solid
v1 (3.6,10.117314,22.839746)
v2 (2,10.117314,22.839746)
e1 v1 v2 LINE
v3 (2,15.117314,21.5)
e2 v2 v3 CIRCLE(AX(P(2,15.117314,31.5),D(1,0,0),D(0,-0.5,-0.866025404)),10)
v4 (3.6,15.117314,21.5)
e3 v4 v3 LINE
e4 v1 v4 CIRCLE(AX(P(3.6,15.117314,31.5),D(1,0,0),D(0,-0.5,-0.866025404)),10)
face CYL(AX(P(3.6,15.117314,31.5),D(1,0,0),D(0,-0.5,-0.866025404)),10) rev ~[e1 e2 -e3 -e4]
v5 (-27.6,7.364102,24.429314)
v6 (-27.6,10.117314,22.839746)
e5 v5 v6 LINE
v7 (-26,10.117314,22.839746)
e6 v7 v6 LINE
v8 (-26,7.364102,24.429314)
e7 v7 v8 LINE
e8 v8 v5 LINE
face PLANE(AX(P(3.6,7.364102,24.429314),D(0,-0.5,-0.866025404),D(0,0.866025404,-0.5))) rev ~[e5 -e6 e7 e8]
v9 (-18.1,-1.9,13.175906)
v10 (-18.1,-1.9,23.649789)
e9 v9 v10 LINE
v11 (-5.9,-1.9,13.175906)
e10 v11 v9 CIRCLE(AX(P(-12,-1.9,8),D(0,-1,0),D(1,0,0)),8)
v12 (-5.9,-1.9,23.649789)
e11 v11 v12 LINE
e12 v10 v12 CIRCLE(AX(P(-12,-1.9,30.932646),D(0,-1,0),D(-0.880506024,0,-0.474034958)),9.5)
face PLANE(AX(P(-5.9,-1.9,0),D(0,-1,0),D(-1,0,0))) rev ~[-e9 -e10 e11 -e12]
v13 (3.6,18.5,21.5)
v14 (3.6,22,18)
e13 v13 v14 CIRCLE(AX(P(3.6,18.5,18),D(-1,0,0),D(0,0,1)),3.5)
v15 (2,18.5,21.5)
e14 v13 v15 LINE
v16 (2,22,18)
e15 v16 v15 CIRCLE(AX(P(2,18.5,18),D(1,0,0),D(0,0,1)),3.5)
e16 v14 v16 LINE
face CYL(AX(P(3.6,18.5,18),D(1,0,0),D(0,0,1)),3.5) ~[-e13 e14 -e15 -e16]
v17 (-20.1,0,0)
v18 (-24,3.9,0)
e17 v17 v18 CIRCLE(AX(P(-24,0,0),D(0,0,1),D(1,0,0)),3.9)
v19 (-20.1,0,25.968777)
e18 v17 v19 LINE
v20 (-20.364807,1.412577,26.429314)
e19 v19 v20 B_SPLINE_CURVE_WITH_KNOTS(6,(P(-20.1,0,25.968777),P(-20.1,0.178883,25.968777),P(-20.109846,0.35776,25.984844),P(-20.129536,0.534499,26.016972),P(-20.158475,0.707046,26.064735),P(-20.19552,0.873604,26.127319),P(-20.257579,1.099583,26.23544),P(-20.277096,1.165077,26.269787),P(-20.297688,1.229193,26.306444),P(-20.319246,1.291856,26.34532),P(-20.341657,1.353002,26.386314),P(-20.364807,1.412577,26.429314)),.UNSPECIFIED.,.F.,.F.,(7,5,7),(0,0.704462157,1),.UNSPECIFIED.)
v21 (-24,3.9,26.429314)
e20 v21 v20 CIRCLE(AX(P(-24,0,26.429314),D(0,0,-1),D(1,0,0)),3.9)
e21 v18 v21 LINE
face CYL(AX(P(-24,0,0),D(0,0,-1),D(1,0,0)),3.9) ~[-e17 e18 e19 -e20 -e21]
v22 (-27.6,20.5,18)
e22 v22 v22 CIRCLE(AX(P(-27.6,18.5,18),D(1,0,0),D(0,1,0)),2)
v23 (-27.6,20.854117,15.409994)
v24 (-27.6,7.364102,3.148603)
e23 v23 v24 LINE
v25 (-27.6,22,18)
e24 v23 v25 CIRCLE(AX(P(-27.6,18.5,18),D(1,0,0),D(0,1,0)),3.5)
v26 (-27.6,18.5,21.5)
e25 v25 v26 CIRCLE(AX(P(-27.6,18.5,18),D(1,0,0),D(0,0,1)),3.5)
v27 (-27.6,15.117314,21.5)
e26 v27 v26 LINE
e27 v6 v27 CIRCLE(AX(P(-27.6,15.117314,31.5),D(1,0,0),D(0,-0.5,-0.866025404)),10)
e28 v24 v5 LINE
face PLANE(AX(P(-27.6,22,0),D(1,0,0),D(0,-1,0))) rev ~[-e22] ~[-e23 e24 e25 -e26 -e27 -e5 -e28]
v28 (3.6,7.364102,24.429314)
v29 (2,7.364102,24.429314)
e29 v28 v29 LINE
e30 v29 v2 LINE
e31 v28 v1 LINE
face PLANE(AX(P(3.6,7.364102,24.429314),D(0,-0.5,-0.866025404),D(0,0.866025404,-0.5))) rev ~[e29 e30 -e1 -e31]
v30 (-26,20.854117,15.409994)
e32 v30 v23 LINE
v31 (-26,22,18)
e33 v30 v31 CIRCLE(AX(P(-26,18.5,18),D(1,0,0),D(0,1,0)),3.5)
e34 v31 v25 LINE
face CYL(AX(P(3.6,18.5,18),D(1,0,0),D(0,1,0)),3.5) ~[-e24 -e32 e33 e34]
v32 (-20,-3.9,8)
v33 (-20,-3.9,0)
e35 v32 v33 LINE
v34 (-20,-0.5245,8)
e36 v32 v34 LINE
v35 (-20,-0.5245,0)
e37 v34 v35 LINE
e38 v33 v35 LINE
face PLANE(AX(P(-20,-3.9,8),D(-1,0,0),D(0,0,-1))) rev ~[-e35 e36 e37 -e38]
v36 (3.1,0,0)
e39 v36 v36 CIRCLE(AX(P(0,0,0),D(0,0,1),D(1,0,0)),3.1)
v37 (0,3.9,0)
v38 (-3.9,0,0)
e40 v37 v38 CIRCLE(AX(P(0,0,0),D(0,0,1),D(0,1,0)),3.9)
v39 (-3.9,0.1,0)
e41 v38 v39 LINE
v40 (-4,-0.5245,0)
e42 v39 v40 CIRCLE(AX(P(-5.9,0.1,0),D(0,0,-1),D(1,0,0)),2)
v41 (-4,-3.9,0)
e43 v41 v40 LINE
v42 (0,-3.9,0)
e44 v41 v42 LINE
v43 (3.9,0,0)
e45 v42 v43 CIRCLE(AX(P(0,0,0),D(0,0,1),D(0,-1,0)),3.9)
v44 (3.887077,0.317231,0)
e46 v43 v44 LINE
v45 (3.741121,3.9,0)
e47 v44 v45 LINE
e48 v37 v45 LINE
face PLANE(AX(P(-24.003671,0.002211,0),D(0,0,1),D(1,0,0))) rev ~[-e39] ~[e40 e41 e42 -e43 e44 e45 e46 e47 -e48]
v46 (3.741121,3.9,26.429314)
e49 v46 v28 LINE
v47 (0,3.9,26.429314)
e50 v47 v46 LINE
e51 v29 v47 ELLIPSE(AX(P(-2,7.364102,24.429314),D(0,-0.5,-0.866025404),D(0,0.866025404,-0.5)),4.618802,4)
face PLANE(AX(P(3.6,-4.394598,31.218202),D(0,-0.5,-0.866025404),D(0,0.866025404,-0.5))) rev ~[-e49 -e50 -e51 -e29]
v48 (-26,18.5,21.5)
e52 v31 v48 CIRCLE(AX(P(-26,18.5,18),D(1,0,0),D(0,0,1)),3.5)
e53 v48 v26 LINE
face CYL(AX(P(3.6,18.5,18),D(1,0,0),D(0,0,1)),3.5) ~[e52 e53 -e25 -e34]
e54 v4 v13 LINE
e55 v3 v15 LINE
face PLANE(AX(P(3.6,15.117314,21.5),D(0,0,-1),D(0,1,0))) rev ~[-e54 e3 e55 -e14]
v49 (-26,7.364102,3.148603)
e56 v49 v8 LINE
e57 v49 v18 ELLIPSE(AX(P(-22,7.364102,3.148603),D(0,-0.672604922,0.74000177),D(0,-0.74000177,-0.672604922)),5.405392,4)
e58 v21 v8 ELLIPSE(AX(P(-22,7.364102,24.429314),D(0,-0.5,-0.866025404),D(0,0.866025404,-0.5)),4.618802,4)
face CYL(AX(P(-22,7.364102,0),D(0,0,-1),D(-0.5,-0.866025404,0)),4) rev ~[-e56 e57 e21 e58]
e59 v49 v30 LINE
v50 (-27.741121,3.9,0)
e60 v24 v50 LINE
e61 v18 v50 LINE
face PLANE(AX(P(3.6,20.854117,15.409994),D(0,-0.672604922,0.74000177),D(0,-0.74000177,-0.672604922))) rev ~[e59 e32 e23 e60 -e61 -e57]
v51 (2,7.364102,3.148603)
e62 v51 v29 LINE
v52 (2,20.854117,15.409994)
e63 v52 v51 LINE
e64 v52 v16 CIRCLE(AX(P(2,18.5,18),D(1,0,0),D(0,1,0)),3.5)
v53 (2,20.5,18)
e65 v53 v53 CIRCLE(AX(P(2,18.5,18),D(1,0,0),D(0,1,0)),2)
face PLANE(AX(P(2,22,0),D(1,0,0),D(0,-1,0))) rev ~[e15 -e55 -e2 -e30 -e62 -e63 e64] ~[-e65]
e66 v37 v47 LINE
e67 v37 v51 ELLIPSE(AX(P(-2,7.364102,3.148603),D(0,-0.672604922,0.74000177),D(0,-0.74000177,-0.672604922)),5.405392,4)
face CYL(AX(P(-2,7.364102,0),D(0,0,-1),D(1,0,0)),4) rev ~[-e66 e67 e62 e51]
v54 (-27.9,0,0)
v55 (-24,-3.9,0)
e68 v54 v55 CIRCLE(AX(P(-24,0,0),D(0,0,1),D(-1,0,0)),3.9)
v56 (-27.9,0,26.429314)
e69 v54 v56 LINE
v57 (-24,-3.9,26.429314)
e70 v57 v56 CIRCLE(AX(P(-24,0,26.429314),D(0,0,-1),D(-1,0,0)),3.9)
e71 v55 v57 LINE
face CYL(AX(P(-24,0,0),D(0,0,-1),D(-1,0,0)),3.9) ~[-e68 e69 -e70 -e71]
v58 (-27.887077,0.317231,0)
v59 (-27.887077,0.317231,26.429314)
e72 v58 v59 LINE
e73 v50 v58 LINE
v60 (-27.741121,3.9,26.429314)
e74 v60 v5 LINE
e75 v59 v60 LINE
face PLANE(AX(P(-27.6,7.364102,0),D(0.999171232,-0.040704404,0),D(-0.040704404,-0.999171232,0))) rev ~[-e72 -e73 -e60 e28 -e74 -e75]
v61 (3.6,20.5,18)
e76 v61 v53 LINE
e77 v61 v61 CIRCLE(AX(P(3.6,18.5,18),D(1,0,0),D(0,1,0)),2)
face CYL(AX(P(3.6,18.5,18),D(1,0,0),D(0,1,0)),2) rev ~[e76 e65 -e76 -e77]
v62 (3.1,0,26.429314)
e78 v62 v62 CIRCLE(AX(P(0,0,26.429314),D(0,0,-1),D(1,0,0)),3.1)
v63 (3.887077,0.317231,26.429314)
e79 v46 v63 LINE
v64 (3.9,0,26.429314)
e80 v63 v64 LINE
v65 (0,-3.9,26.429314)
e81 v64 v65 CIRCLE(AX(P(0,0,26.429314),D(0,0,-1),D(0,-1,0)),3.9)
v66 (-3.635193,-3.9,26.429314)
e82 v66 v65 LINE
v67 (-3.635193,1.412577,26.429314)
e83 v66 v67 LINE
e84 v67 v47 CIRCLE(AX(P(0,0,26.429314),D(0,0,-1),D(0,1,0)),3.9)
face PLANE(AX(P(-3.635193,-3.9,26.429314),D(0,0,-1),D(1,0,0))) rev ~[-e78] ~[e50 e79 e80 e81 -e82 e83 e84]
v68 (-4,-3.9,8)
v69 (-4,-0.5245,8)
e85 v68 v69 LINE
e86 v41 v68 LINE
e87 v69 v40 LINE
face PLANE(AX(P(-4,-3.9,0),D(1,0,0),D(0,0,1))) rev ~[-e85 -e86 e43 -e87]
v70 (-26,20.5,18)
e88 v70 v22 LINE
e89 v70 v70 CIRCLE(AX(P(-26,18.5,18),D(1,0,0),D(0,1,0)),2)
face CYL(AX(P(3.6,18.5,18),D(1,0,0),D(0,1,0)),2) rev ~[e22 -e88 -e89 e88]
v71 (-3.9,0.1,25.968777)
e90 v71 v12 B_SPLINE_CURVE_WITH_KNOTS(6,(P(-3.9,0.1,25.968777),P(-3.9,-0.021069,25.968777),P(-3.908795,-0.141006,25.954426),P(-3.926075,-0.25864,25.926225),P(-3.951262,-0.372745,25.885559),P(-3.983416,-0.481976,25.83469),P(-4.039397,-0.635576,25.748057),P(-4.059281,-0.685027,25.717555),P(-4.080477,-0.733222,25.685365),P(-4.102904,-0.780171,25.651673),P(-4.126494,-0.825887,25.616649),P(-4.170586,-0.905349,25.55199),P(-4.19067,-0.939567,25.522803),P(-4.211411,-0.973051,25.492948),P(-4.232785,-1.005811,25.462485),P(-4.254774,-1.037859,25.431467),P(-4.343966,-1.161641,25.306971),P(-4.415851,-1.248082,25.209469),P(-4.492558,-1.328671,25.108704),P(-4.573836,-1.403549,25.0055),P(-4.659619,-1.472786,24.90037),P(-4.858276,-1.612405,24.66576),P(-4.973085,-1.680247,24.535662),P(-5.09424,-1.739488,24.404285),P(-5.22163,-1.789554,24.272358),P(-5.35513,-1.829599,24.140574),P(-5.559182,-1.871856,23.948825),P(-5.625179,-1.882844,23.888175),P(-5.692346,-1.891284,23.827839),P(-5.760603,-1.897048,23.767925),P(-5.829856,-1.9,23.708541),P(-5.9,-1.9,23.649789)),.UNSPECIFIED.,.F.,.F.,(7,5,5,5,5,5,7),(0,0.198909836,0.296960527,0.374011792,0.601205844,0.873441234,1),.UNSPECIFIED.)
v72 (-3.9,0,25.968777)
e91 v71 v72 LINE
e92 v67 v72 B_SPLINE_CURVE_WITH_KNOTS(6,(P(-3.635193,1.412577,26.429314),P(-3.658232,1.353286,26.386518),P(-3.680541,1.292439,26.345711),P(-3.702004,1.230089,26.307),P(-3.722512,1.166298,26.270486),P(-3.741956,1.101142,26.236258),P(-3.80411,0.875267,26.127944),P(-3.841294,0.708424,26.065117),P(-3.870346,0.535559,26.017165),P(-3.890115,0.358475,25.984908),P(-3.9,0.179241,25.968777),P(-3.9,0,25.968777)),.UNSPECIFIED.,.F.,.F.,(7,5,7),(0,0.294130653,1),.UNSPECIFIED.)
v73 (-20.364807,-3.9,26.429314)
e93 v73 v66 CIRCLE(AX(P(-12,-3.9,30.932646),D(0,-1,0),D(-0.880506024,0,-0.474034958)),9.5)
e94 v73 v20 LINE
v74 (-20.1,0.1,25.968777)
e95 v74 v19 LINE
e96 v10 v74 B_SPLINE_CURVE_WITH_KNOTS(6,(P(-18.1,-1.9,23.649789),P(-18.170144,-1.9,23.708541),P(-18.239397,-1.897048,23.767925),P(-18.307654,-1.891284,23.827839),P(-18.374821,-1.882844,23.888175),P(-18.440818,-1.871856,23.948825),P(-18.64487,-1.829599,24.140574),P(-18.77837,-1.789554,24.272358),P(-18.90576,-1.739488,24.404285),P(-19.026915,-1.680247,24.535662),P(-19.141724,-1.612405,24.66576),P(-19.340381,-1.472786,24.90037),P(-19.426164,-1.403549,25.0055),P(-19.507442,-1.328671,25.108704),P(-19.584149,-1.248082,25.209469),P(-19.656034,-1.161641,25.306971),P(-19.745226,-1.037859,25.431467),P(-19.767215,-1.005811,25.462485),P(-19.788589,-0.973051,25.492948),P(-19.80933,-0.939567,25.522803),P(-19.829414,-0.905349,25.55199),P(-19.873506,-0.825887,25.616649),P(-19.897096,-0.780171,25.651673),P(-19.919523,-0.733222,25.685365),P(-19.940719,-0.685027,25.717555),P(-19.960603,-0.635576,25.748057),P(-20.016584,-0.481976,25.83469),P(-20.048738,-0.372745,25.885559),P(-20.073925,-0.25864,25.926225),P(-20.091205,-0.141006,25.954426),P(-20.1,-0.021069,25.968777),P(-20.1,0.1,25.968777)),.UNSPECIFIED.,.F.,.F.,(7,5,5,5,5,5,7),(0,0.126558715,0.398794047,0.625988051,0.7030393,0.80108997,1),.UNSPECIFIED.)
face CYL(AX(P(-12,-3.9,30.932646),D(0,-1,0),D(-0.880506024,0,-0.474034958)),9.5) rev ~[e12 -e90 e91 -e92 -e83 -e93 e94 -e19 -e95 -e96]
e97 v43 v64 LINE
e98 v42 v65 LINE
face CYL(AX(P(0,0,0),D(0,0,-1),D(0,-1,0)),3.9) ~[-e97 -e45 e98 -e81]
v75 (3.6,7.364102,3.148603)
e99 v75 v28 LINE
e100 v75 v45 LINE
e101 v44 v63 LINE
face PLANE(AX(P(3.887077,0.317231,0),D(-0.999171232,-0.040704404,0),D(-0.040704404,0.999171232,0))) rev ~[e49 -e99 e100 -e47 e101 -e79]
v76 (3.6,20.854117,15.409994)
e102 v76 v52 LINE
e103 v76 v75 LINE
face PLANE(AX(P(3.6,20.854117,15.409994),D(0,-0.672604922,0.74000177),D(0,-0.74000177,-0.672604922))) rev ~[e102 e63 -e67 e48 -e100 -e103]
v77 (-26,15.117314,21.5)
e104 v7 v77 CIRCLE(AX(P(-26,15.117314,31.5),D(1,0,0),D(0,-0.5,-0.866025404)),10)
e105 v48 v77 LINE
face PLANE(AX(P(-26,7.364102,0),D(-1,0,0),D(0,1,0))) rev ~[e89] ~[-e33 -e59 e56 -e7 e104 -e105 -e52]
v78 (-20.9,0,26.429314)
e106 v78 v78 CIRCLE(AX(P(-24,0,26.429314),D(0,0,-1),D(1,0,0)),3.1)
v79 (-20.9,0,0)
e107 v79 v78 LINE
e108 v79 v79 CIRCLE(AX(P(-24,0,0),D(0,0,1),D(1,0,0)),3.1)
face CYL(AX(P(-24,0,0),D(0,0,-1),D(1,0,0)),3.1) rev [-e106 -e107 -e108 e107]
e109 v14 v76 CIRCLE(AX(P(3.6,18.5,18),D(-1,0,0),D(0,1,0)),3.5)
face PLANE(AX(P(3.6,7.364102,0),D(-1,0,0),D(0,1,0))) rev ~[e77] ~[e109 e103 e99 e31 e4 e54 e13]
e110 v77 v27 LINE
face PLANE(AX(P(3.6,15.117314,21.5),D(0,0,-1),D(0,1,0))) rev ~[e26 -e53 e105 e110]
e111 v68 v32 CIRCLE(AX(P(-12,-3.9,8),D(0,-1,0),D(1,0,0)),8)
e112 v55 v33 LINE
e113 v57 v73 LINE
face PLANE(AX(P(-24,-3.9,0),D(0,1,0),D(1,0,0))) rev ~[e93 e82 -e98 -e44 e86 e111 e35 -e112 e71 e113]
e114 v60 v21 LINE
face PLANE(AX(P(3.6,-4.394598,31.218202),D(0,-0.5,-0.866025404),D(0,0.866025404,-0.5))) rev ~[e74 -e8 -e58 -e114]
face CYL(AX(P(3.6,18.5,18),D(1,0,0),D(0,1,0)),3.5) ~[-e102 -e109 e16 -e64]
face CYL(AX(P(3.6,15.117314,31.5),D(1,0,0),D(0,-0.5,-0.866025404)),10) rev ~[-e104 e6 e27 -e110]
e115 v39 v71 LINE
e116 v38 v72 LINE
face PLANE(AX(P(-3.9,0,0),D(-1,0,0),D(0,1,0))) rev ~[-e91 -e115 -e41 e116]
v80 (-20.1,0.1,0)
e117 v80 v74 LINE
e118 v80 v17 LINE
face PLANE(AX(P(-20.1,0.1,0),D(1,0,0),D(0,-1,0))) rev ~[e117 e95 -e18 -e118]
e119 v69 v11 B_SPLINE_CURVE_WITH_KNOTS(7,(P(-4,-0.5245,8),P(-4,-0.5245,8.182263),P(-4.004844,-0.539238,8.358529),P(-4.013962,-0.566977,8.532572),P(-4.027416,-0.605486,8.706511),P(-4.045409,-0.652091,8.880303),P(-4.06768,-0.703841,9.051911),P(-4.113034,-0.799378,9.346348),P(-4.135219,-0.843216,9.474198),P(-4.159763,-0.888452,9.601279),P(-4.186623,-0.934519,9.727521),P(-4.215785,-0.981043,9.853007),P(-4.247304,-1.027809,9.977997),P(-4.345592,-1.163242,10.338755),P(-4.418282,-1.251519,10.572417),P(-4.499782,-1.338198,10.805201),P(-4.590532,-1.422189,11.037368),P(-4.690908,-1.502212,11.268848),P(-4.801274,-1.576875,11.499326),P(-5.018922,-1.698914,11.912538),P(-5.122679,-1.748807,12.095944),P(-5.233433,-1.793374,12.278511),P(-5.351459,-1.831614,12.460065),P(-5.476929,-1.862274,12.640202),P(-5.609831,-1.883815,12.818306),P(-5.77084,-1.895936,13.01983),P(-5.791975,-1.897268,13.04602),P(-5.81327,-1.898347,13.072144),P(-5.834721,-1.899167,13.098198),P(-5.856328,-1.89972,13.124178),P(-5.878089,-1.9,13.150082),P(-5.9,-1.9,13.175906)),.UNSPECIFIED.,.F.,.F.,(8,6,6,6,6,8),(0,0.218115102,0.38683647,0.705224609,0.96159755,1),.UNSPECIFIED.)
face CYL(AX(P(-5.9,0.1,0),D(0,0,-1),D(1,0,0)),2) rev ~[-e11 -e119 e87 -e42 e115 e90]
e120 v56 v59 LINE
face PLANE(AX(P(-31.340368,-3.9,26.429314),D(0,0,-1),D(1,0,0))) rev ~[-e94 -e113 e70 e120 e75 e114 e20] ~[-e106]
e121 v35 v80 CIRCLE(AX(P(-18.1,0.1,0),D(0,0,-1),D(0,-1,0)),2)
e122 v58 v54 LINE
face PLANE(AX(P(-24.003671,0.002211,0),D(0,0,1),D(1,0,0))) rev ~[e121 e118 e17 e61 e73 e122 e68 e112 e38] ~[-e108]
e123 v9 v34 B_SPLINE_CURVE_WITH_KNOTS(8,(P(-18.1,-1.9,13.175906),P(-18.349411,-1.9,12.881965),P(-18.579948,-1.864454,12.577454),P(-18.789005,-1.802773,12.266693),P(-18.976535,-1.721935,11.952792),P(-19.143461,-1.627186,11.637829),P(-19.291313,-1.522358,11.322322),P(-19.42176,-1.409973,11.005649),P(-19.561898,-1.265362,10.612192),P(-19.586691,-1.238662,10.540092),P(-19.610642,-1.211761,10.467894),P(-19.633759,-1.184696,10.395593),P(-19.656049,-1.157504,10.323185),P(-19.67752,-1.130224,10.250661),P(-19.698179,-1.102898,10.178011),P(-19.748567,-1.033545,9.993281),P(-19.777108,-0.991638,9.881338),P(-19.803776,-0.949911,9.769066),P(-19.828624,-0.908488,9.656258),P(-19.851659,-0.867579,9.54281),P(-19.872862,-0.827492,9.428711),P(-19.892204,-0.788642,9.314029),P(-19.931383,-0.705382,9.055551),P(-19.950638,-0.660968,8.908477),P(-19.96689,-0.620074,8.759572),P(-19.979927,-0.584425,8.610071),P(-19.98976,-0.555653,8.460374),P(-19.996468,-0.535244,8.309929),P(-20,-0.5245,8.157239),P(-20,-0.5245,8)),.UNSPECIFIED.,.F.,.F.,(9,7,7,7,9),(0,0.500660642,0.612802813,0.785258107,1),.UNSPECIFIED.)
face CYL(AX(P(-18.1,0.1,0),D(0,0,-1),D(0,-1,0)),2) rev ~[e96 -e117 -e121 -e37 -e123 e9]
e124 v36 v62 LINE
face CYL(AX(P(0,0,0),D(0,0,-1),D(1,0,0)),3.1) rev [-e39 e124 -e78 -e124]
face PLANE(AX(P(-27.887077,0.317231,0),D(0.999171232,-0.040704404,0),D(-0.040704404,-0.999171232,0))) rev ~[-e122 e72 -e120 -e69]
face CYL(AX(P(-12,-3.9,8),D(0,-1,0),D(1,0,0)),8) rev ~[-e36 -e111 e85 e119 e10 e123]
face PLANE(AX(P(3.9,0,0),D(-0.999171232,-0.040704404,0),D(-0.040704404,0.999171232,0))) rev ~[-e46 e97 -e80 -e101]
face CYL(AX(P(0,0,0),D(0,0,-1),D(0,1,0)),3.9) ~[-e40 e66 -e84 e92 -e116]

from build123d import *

# Parameters (mm, degrees)
F0_R          = 3.1
F1_DEPTH      = 35
F2_R          = 2
F3_DEPTH      = 31.501
F3_DEPTH_BACK = 0.301
F5_DEPTH      = 25.901


# Not quite as in the source:
# - a feature names something its author has since deleted; it is built from what else it names


with BuildPart() as f1:
    # F0 (on Top) → F1 (new body)
    with BuildSketch(Plane.XY):
        with BuildLine():
            ThreePointArc((-27.9, 0), (-26.7577164466, -2.7577164466), (-24, -3.9))
            ThreePointArc((-24, -3.9), (-21.2422835534, -2.7577164466), (-20.1, 0))
            ThreePointArc((-20.1, 0), (-21.2422835534, 2.7577164466), (-24, 3.9))
            ThreePointArc((-24, 3.9), (-26.643179735, 2.8676821456), (-27.8870765814, 0.3172312247))
            Line((-27.8870765814, 0.3172312247), (-27.9, 0))
        make_face()
        with Locations((-24, 0)):
            Circle(F0_R, mode=Mode.SUBTRACT)
        with BuildLine():
            Line((-27.6, 7.3641016151), (-27.8870765814, 0.3172312247))
            ThreePointArc((-27.8870765814, 0.3172312247), (-26.643179735, 2.8676821456), (-24, 3.9))
            ThreePointArc((-24, 3.9), (-25.4641016151, 5.3641016151), (-26, 7.3641016151))
            Line((-26, 7.3641016151), (-26, 22))
            Line((-26, 22), (-27.6, 22))
            Line((-27.6, 22), (-27.6, 7.3641016151))
        make_face()
        with BuildLine():
            ThreePointArc((0, -3.9), (-2.7577164466, -2.7577164466), (-3.9, 0))
            Line((-3.9, 0), (-3.9, 0.1))
            ThreePointArc((-3.9, 0.1), (-4.4857864376, -1.3142135624), (-5.9, -1.9))
            Line((-5.9, -1.9), (-18.1, -1.9))
            ThreePointArc((-18.1, -1.9), (-19.5142135624, -1.3142135624), (-20.1, 0.1))
            Line((-20.1, 0.1), (-20.1, 0))
            ThreePointArc((-20.1, 0), (-21.2422835534, -2.7577164466), (-24, -3.9))
            Line((-24, -3.9), (0, -3.9))
        make_face()
        with BuildLine():
            Line((3.9, 0), (3.8870765814, 0.3172312247))
            ThreePointArc((3.8870765814, 0.3172312247), (2.643179735, 2.8676821456), (0, 3.9))
            ThreePointArc((0, 3.9), (-2.7577164466, 2.7577164466), (-3.9, 0))
            ThreePointArc((-3.9, 0), (-2.7577164466, -2.7577164466), (0, -3.9))
            ThreePointArc((0, -3.9), (2.7577164466, -2.7577164466), (3.9, 0))
        make_face()
        Circle(F0_R, mode=Mode.SUBTRACT)
        with BuildLine():
            Line((3.6, 7.3641016151), (3.6, 22))
            Line((3.6, 22), (2, 22))
            Line((2, 22), (2, 7.3641016151))
            ThreePointArc((2, 7.3641016151), (1.4641016151, 5.3641016151), (0, 3.9))
            ThreePointArc((0, 3.9), (2.643179735, 2.8676821456), (3.8870765814, 0.3172312247))
            Line((3.8870765814, 0.3172312247), (3.6, 7.3641016151))
        make_face()
    extrude(amount=F1_DEPTH)

    # F2 (on face) → F3 (cut, two sides)
    with BuildSketch(Plane.YZ.offset(3.6)) as f3_sk:
        with BuildLine():
            ThreePointArc((18.5, 21.5), (20.9748737342, 20.4748737342), (22, 18))
            Line((22, 18), (22, 35))
            Line((22, 35), (7.3641016151, 35))
            Line((7.3641016151, 35), (7.3641016151, 24.4293139302))
            Line((7.3641016151, 24.4293139302), (10.1173140978, 22.8397459622))
            ThreePointArc((10.1173140978, 22.8397459622), (12.5291236468, 21.8407417371), (15.1173140978, 21.5))
            Line((15.1173140978, 21.5), (18.5, 21.5))
        make_face()
        Polygon((22, 35), (22, 18), (29.6666024476, 18), (29.6666024476, 42.8468726724), (-4.3945980379, 42.8468726724), (-4.3945980379, 31.2182023401), (7.3641016151, 24.4293139302), (7.3641016151, 35), align=None)
        with Locations((18.5, 18)):
            Circle(F2_R)
        with BuildLine():
            Line((22, 0), (22, 18))
            ThreePointArc((22, 18), (21.7007350945, 16.5839156612), (20.8541172259, 15.4099938057))
            Line((20.8541172259, 15.4099938057), (7.3641016151, 3.1486030042))
            Line((7.3641016151, 3.1486030042), (7.3641016151, 0))
            Line((7.3641016151, 0), (22, 0))
        make_face()
        Polygon((7.3641016151, 0), (7.3641016151, 3.1486030042), (3.9, 0), align=None)
    extrude(amount=-F3_DEPTH, mode=Mode.SUBTRACT)
    extrude(f3_sk.sketch, amount=F3_DEPTH_BACK, mode=Mode.SUBTRACT)

    # F4 (on face) → F5 (cut, through all)
    with BuildSketch(Plane.XZ.offset(3.9)):
        with BuildLine():
            ThreePointArc((-12, 0), (-6.3431457505, 2.3431457505), (-4, 8))
            ThreePointArc((-4, 8), (-12, 16), (-20, 8))
            ThreePointArc((-20, 8), (-17.6568542495, 2.3431457505), (-12, 0))
        make_face()
        with BuildLine():
            Line((-4, 0), (-4, 8))
            ThreePointArc((-4, 8), (-6.3431457505, 2.3431457505), (-12, 0))
            Line((-12, 0), (-4, 0))
        make_face()
        with BuildLine():
            ThreePointArc((-12, 0), (-17.6568542495, 2.3431457505), (-20, 8))
            Line((-20, 8), (-20, 0))
            Line((-20, 0), (-12, 0))
        make_face()
        with BuildLine():
            Line((0, 30.9326460298), (0, 26.4293139302))
            Line((0, 26.4293139302), (8.4664272144, 26.4293139302))
            Line((8.4664272144, 26.4293139302), (8.4664272144, 34.5878303051))
            Line((8.4664272144, 34.5878303051), (-3.2313269012, 34.5878303051))
            ThreePointArc((-3.2313269012, 34.5878303051), (-2.6846257606, 32.7964600712), (-2.5, 30.9326460298))
            Line((-2.5, 30.9326460298), (0, 30.9326460298))
        make_face()
        with BuildLine():
            Line((-3.6351927697, 26.4293139302), (0, 26.4293139302))
            Line((0, 26.4293139302), (0, 30.9326460298))
            Line((0, 30.9326460298), (-2.5, 30.9326460298))
            ThreePointArc((-2.5, 30.9326460298), (-2.7881687844, 28.6105423164), (-3.6351927697, 26.4293139302))
        make_face()
        with BuildLine():
            Line((-24, 30.9326460298), (-24, 26.4293139302))
            Line((-24, 26.4293139302), (-20.3648072303, 26.4293139302))
            ThreePointArc((-20.3648072303, 26.4293139302), (-21.2118312156, 28.6105423164), (-21.5, 30.9326460298))
            Line((-21.5, 30.9326460298), (-24, 30.9326460298))
        make_face()
        with BuildLine():
            Line((-31.3403680921, 26.4293139302), (-24, 26.4293139302))
            Line((-24, 26.4293139302), (-24, 30.9326460298))
            Line((-24, 30.9326460298), (-21.5, 30.9326460298))
            ThreePointArc((-21.5, 30.9326460298), (-21.3153742394, 32.7964600712), (-20.7686730988, 34.5878303051))
            Line((-20.7686730988, 34.5878303051), (-31.3403680921, 34.5878303051))
            Line((-31.3403680921, 34.5878303051), (-31.3403680921, 26.4293139302))
        make_face()
        with BuildLine():
            Line((-20.3648072303, 26.4293139302), (-3.6351927697, 26.4293139302))
            ThreePointArc((-3.6351927697, 26.4293139302), (-2.7881687844, 28.6105423164), (-2.5, 30.9326460298))
            Line((-2.5, 30.9326460298), (-21.5, 30.9326460298))
            ThreePointArc((-21.5, 30.9326460298), (-21.2118312156, 28.6105423164), (-20.3648072303, 26.4293139302))
        make_face()
        with BuildLine():
            ThreePointArc((-20.3648072303, 26.4293139302), (-12, 21.4326460298), (-3.6351927697, 26.4293139302))
            Line((-3.6351927697, 26.4293139302), (-20.3648072303, 26.4293139302))
        make_face()
    extrude(amount=-F5_DEPTH, mode=Mode.SUBTRACT)


solid = f1.part
